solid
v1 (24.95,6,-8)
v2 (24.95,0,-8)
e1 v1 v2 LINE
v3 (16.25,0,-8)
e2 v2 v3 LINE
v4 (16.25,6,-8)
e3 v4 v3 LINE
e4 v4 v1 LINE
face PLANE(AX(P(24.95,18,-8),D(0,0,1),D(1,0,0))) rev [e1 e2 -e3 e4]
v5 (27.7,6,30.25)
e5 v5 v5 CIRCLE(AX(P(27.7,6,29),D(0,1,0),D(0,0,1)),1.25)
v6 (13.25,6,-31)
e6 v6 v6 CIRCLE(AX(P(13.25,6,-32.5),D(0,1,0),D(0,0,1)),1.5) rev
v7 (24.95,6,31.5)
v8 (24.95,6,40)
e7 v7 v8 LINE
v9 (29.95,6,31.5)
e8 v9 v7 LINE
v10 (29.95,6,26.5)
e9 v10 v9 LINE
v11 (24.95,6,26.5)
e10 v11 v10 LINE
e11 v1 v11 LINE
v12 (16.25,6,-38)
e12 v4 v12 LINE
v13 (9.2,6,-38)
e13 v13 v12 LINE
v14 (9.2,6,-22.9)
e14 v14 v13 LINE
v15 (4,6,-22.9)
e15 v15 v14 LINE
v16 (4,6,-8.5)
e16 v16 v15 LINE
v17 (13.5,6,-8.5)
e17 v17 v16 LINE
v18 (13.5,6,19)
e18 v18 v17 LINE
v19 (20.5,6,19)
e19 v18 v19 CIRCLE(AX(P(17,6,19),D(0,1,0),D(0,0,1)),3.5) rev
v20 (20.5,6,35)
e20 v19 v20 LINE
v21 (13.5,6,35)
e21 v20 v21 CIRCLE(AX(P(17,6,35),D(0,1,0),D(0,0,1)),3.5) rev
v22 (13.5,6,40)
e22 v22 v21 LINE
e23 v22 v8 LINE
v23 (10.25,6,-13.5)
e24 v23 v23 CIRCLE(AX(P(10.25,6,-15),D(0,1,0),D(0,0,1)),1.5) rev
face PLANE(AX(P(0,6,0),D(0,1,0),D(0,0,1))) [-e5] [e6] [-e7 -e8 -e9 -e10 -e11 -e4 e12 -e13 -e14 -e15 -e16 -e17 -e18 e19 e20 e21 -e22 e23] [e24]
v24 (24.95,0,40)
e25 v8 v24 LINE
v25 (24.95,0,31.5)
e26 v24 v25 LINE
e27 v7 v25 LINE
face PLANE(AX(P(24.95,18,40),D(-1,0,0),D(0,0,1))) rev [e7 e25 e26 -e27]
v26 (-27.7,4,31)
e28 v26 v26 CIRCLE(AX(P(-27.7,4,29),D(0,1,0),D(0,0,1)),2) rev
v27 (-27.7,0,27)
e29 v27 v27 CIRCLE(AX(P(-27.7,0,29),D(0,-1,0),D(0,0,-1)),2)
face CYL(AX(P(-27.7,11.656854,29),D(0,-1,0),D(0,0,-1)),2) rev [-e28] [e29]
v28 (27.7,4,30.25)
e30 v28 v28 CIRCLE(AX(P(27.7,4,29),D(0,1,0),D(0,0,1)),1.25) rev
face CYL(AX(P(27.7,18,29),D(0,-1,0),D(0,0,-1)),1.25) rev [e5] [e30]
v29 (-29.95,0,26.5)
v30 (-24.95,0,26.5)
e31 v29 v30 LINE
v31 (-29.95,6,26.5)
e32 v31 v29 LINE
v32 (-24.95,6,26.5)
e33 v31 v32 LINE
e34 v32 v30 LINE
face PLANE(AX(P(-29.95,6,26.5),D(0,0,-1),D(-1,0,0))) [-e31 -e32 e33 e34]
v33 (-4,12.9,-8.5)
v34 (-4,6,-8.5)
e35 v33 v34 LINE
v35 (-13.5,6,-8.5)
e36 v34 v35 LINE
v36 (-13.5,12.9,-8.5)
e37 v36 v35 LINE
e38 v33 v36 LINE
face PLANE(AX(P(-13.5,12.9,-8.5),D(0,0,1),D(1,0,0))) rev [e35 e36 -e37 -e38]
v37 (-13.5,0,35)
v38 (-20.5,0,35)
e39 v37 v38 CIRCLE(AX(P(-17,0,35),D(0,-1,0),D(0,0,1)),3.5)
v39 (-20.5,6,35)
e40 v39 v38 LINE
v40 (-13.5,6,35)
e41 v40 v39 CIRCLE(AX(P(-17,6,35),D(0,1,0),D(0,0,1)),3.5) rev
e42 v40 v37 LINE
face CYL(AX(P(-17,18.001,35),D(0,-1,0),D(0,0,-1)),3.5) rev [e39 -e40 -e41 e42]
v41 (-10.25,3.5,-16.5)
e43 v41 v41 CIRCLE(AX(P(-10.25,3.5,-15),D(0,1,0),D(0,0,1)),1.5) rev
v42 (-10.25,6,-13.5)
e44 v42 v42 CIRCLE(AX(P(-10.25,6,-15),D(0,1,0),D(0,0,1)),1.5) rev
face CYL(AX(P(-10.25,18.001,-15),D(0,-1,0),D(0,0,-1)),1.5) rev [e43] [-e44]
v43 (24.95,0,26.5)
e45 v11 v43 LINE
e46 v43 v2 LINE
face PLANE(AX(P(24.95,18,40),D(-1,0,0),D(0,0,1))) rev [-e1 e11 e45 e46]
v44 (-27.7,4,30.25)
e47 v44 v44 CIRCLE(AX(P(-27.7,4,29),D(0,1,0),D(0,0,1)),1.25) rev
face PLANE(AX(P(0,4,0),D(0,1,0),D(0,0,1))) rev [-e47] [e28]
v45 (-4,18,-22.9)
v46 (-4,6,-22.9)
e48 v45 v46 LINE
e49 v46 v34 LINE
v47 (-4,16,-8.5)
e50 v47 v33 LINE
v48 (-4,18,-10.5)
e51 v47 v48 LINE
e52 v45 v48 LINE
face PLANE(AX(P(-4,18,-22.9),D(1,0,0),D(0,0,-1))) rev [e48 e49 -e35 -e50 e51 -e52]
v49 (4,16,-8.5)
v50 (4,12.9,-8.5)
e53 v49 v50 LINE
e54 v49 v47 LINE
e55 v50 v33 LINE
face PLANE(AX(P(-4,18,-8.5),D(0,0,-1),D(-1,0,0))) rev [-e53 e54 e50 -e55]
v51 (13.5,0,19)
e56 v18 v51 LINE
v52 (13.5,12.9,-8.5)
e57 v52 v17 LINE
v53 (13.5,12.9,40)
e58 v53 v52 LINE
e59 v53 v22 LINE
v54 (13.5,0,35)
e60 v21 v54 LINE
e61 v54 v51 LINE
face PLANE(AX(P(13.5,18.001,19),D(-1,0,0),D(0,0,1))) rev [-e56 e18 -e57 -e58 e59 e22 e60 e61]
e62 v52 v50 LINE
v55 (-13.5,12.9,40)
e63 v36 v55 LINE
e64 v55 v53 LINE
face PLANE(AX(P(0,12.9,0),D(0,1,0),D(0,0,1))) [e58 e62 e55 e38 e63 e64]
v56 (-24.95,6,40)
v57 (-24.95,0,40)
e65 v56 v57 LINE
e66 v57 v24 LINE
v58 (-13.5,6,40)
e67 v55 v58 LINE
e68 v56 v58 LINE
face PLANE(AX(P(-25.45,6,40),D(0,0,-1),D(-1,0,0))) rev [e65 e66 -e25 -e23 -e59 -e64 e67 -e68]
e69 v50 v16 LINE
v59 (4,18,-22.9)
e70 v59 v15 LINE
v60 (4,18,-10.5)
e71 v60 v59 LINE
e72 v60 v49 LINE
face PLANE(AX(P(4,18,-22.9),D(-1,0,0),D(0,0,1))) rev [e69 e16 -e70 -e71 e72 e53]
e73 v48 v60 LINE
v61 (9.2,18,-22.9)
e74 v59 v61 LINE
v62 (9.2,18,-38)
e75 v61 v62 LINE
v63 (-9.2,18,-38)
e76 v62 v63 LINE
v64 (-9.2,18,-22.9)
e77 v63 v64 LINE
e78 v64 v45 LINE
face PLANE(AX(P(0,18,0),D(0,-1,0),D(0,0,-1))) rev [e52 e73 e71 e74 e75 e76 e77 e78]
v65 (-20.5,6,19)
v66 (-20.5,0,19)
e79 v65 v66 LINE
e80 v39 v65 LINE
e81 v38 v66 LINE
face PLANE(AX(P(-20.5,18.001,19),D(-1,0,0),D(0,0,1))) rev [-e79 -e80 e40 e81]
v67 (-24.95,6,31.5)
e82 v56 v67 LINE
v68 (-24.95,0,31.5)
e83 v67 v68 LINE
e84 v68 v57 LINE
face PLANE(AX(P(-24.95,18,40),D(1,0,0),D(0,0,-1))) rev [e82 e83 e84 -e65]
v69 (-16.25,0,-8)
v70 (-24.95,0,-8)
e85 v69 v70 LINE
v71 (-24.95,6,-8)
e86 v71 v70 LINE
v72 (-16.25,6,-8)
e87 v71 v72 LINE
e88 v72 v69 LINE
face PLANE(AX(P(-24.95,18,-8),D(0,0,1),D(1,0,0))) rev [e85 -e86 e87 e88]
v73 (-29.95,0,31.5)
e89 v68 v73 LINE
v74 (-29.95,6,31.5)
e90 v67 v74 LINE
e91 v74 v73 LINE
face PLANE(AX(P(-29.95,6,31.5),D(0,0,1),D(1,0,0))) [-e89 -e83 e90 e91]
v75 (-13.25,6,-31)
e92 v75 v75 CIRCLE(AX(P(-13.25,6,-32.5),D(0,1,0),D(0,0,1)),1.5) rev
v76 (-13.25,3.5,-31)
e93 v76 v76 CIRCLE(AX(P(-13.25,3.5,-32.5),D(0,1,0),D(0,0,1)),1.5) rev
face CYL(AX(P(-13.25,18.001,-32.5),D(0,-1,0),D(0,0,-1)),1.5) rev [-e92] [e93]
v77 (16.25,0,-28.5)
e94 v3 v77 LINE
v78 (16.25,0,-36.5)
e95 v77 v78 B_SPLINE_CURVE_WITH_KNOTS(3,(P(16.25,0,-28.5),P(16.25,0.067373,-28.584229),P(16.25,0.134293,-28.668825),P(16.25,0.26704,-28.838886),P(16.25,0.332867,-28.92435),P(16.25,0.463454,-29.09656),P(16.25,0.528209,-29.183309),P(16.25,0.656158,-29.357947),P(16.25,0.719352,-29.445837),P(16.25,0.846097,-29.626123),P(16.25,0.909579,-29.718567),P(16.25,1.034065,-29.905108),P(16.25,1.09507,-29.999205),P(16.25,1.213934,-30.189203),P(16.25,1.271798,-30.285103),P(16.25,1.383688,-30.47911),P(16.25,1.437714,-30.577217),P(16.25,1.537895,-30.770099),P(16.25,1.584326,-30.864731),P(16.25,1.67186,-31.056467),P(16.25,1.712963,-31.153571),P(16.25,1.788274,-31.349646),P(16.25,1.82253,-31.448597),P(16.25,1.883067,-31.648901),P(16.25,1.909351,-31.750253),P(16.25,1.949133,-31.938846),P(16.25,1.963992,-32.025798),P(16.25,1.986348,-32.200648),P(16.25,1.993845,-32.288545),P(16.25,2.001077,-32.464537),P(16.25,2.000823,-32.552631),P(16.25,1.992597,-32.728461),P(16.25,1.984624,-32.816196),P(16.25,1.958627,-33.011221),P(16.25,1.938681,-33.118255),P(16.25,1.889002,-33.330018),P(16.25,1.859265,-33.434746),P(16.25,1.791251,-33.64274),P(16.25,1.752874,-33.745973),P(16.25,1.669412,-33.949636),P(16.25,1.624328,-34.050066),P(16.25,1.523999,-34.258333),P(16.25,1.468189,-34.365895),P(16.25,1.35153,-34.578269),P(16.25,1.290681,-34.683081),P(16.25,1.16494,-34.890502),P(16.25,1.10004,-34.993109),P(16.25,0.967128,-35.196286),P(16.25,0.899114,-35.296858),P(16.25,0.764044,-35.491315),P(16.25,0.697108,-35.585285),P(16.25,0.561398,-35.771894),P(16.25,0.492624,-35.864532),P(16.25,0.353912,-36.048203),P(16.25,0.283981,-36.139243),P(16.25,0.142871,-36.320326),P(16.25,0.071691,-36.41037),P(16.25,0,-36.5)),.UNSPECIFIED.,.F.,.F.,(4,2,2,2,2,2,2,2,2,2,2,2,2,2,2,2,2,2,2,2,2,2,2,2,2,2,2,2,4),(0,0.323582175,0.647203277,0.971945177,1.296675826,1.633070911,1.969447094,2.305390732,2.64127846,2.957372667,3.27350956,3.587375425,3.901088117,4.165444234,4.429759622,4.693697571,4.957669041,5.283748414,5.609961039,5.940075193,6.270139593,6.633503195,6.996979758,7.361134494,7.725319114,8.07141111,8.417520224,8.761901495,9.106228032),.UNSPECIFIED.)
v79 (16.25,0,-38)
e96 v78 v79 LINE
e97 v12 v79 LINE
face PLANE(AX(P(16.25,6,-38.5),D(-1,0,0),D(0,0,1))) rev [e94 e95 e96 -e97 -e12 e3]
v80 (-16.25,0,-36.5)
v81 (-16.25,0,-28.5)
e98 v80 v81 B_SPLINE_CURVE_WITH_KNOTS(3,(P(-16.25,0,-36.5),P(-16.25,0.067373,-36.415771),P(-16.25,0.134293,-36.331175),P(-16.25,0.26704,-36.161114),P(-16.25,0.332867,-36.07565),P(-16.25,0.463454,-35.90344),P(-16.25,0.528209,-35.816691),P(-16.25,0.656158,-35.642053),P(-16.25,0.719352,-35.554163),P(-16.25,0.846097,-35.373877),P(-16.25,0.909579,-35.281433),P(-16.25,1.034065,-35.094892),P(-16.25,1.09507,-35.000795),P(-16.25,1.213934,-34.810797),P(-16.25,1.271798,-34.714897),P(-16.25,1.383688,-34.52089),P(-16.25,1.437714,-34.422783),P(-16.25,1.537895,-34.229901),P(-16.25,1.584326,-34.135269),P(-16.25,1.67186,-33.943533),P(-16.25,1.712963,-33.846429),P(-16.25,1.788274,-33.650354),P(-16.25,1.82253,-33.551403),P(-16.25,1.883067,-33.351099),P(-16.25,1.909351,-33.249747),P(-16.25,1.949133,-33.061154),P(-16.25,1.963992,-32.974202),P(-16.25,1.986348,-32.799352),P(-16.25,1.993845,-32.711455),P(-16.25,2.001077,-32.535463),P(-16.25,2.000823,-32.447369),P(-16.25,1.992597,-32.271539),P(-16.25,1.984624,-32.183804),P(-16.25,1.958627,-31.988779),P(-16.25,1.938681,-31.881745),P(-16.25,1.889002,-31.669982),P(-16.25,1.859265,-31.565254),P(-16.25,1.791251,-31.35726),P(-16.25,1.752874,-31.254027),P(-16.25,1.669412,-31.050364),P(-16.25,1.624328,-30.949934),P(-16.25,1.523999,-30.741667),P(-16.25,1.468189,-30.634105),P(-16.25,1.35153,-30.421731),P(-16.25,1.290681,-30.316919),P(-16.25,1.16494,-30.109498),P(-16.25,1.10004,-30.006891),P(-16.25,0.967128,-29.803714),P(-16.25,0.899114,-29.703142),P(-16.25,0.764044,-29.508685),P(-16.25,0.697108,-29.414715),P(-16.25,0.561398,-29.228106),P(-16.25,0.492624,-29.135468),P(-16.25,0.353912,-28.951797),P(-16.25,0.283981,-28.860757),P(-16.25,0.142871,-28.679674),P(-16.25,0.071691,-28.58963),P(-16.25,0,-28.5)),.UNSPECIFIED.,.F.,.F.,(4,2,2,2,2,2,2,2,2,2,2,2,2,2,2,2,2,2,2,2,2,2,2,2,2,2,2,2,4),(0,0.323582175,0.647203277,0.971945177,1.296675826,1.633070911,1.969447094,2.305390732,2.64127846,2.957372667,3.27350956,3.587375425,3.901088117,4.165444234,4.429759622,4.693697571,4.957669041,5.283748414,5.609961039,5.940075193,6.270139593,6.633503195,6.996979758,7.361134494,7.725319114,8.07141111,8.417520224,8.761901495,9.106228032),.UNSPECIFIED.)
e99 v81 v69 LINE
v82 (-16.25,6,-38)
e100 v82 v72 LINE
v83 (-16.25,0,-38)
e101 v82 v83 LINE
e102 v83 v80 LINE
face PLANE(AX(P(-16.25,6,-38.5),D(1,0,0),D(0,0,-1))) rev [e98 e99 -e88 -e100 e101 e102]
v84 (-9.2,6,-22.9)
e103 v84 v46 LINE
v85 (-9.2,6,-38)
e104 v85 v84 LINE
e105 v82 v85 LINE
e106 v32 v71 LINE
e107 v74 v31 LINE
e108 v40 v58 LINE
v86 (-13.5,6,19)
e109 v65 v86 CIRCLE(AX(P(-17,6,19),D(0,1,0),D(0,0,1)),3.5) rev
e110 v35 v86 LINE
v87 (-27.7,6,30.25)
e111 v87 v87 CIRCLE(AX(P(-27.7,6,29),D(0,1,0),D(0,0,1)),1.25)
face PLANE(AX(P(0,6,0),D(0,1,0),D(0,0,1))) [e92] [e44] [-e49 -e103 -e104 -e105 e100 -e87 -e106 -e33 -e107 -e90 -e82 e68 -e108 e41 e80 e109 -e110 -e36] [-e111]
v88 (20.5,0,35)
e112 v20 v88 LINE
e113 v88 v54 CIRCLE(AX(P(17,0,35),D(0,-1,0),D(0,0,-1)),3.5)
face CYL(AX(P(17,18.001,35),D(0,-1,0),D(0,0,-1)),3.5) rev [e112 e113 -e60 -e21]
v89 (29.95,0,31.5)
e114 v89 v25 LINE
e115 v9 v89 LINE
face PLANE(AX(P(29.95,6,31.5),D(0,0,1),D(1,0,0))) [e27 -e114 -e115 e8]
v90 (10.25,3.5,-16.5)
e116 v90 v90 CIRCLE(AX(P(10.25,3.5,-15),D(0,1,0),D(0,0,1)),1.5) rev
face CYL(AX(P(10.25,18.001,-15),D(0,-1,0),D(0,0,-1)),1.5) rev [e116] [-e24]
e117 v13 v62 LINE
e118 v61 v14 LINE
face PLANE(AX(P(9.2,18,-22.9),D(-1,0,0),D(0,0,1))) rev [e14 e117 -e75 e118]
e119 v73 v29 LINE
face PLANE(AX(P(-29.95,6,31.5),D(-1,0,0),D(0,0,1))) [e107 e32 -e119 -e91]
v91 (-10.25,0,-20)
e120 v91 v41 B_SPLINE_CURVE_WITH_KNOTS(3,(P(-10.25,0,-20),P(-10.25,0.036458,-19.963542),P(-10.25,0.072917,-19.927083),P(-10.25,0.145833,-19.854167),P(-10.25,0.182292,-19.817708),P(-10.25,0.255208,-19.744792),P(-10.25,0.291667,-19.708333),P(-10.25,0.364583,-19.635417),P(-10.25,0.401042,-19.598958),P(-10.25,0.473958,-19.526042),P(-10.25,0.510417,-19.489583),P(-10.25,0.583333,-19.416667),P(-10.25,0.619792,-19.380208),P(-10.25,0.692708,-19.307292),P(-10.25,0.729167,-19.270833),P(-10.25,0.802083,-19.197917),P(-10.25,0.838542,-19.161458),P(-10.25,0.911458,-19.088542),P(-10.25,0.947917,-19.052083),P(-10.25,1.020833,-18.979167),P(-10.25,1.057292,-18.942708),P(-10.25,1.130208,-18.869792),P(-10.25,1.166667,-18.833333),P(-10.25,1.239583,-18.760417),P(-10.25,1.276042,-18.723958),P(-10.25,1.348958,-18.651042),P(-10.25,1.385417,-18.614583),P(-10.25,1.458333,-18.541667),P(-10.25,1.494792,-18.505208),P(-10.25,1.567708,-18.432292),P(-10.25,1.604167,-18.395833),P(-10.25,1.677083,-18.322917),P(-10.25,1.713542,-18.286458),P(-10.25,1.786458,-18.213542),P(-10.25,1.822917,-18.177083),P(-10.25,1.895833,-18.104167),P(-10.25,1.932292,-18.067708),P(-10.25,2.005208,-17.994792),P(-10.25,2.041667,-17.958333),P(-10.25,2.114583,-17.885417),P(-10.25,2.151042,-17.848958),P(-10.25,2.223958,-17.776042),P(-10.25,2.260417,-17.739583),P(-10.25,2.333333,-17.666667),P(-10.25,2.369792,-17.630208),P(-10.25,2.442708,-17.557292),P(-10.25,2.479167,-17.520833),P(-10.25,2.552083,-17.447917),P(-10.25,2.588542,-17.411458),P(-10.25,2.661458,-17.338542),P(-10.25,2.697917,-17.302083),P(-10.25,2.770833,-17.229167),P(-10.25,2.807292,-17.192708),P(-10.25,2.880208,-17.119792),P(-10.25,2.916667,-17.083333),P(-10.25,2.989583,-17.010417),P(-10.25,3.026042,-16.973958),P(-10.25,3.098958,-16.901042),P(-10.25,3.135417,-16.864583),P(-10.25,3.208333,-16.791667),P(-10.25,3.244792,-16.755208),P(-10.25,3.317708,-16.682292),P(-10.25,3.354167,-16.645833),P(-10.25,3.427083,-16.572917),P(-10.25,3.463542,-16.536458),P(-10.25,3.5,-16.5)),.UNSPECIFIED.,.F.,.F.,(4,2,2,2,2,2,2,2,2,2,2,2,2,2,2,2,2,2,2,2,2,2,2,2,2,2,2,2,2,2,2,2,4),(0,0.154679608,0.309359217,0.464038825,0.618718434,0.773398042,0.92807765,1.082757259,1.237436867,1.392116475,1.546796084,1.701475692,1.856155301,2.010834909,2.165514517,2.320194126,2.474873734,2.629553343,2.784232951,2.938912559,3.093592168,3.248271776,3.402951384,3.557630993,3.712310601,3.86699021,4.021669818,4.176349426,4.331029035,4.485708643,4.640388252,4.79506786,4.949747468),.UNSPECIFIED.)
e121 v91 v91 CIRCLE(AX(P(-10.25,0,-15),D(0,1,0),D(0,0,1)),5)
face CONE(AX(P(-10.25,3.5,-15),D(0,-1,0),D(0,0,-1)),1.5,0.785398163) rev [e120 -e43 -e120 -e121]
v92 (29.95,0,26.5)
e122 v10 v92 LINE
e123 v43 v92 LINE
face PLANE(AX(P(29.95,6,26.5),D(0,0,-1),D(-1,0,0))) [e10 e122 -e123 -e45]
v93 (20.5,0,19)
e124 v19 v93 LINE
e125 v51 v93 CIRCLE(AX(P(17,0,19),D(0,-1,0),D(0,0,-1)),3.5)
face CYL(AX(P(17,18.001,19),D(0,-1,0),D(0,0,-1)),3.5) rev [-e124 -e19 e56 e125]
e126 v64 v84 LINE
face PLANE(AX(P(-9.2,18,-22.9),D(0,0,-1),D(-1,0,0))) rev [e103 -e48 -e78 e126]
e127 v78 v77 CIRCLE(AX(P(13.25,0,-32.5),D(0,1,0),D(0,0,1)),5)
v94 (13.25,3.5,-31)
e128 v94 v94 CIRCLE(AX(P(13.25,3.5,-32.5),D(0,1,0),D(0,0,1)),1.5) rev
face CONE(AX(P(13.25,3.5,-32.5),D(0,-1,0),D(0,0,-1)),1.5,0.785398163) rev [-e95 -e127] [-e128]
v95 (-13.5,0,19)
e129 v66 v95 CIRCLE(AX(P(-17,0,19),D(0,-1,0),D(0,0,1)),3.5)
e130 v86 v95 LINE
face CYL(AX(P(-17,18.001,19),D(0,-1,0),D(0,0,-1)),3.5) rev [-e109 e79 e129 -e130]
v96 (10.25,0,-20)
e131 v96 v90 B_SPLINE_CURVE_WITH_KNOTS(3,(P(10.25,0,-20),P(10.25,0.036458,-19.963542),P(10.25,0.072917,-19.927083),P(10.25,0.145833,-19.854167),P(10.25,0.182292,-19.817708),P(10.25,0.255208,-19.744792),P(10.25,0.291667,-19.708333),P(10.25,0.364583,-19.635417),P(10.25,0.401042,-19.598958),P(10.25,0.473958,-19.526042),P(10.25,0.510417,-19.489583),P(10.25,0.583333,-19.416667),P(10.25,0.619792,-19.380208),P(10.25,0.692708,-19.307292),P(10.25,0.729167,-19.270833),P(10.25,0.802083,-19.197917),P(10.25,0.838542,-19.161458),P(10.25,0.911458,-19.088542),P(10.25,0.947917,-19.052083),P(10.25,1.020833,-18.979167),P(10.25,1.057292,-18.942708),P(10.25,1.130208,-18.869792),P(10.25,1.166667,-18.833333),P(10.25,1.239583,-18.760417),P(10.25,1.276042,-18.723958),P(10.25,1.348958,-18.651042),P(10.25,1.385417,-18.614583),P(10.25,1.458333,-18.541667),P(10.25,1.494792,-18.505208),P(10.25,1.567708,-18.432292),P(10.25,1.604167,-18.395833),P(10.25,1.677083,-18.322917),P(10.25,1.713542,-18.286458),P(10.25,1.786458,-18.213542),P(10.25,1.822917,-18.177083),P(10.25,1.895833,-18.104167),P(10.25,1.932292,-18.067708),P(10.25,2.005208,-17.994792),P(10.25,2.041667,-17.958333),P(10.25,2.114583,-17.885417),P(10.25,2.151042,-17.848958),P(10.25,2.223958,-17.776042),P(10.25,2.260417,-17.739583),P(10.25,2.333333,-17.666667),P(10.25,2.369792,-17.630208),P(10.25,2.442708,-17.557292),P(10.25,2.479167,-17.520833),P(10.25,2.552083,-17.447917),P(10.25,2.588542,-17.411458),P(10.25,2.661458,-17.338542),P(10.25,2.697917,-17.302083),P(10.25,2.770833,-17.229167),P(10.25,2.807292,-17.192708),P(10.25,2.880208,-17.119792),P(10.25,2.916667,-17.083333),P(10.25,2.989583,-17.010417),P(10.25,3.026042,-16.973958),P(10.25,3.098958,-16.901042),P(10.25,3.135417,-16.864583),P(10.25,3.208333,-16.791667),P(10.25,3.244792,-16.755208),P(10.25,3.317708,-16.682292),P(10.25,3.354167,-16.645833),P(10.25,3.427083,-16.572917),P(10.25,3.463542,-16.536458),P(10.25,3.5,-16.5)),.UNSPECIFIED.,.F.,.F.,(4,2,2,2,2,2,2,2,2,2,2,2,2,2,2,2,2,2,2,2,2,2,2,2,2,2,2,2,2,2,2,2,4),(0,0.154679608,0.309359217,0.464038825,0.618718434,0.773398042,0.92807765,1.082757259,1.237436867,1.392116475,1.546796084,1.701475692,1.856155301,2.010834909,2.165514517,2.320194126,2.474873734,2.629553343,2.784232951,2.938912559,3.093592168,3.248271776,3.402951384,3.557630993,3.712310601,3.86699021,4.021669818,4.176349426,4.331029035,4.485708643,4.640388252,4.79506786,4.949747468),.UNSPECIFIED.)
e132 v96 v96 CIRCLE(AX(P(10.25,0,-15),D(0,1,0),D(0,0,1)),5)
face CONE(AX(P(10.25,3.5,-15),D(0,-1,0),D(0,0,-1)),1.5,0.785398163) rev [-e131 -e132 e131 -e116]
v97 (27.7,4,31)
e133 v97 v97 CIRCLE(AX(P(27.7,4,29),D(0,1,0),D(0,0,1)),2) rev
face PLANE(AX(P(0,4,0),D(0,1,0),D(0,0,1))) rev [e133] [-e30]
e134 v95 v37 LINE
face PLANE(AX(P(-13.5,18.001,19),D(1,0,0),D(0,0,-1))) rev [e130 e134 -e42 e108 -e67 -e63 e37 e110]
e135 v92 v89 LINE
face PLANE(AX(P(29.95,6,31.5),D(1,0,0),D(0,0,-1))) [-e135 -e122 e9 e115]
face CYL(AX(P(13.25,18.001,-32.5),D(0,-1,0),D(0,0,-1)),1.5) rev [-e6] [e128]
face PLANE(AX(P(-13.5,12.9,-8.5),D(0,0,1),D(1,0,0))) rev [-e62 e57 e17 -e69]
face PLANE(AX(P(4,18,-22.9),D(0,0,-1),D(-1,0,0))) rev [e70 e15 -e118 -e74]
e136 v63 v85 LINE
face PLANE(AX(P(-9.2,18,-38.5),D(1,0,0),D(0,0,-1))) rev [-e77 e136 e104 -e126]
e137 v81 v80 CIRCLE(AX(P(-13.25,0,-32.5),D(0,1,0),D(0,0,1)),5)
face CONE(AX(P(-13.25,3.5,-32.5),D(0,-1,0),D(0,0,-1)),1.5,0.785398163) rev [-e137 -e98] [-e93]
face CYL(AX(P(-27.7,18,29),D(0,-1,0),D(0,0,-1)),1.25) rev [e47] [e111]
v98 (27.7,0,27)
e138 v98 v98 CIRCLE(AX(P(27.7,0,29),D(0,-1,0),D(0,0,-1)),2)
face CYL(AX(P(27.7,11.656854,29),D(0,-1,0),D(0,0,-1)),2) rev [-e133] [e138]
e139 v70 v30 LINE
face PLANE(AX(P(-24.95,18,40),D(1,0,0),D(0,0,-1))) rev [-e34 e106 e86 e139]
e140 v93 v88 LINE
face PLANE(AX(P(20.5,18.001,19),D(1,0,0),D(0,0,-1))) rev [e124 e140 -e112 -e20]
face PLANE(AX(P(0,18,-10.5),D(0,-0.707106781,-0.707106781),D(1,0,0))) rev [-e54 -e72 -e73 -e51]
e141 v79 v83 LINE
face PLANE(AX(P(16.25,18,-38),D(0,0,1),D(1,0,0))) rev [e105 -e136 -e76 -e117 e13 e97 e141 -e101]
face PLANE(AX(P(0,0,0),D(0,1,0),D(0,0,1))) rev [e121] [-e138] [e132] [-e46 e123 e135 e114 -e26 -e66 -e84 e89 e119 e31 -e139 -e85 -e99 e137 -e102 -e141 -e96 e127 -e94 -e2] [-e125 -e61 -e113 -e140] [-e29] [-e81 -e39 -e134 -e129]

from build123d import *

# Parameters (mm, degrees)
EXTRUDE_1_DEPTH     = 6
EXTRUDE_2_DEPTH     = 12
CUT_EXTRUDE_1_REACH = 52.712
SKETCH_3_R          = 1.5
CHAMFER_1_SIZE      = 2
SKETCH_4_W          = 27
SKETCH_4_H          = 48.5
EXTRUDE_3_DEPTH     = 6.9
SKETCH_5_W          = 32.5
SKETCH_5_H          = 0.5
CUT_EXTRUDE_2_DEPTH = 51.711956184
SKETCH_6_W          = 5
SKETCH_6_H          = 5
EXTRUDE_4_DEPTH     = 6
SKETCH_9_R          = 1.25
CUT_EXTRUDE_5_DEPTH = 54.113110434
SKETCH_10_R         = 2
CUT_EXTRUDE_6_DEPTH = 4
CHAMFER_3_SIZE      = 3.5


with BuildPart() as part:
    # 草图1 → 凸台-拉伸1 (new body)
    with BuildSketch(Plane(origin=(0, 0, 0), x_dir=(1, 0, 0), z_dir=(0, 1, 0))):
        Polygon((-25.45, -32), (-25.45, -28), (-25.45, -3.5), (-25.45, 0.5), (-25.45, 8.5), (-16.25, 8.5), (-16.25, 38.5), (16.25, 38.5), (16.25, 8.5), (25.45, 8.5), (25.45, 0.5), (25.45, -3.5), (25.45, -28), (25.45, -32), (25.45, -40), (-25.45, -40), align=None)
    extrude(amount=EXTRUDE_1_DEPTH)

    # 草图2 → 凸台-拉伸2 (add)
    with BuildSketch(Plane(origin=(0, 6, 0), x_dir=(1, 0, 0), z_dir=(0, 1, 0))):
        Polygon((-4, 22.9), (-4, 8.5), (4, 8.5), (4, 22.9), (9.2, 22.9), (9.2, 38.5), (-9.2, 38.5), (-9.2, 22.9), align=None)
    extrude(amount=EXTRUDE_2_DEPTH)

    # 草图3 → 切除-拉伸1 (cut, up to next)
    with BuildSketch(Plane.XZ, mode=Mode.PRIVATE) as cut_extrude_1_sk1:
        with Locations(Location((13.25, -32.5, 0), (0, 0, 270))):
            Circle(SKETCH_3_R)
    cut_extrude_1_tool1 = extrude(cut_extrude_1_sk1.sketch, amount=-CUT_EXTRUDE_1_REACH, mode=Mode.PRIVATE) & part.part
    # 草图3 → 切除-拉伸1 (cut, up to next)
    with BuildSketch(Plane.XZ, mode=Mode.PRIVATE) as cut_extrude_1_sk2:
        with Locations(Location((10.25, -15, 0), (0, 0, 270))):
            Circle(SKETCH_3_R)
    cut_extrude_1_tool2 = extrude(cut_extrude_1_sk2.sketch, amount=-CUT_EXTRUDE_1_REACH, mode=Mode.PRIVATE) & part.part
    # 草图3 → 切除-拉伸1 (cut, up to next)
    with BuildSketch(Plane.XZ, mode=Mode.PRIVATE) as cut_extrude_1_sk3:
        with Locations(Location((-13.25, -32.5, 0), (0, 0, 90))):
            Circle(SKETCH_3_R)
    cut_extrude_1_tool3 = extrude(cut_extrude_1_sk3.sketch, amount=-CUT_EXTRUDE_1_REACH, mode=Mode.PRIVATE) & part.part
    # 草图3 → 切除-拉伸1 (cut, up to next)
    with BuildSketch(Plane.XZ, mode=Mode.PRIVATE) as cut_extrude_1_sk4:
        with Locations(Location((-10.25, -15, 0), (0, 0, 90))):
            Circle(SKETCH_3_R)
    cut_extrude_1_tool4 = extrude(cut_extrude_1_sk4.sketch, amount=-CUT_EXTRUDE_1_REACH, mode=Mode.PRIVATE) & part.part
    # 草图3 → 切除-拉伸1 (cut, up to next)
    with BuildSketch(Plane.XZ, mode=Mode.PRIVATE) as cut_extrude_1_sk5:
        with BuildLine():
            Line((13.5, 19), (13.5, 35))
            ThreePointArc((13.5, 35), (17, 38.5), (20.5, 35))
            Line((20.5, 35), (20.5, 19))
            ThreePointArc((20.5, 19), (17, 15.5), (13.5, 19))
        make_face()
    cut_extrude_1_tool5 = extrude(cut_extrude_1_sk5.sketch, amount=-CUT_EXTRUDE_1_REACH, mode=Mode.PRIVATE) & part.part
    # 草图3 → 切除-拉伸1 (cut, up to next)
    with BuildSketch(Plane.XZ, mode=Mode.PRIVATE) as cut_extrude_1_sk6:
        with BuildLine():
            Line((-13.5, 19), (-13.5, 35))
            ThreePointArc((-13.5, 35), (-17, 38.5), (-20.5, 35))
            Line((-20.5, 35), (-20.5, 19))
            ThreePointArc((-20.5, 19), (-17, 15.5), (-13.5, 19))
        make_face()
    cut_extrude_1_tool6 = extrude(cut_extrude_1_sk6.sketch, amount=-CUT_EXTRUDE_1_REACH, mode=Mode.PRIVATE) & part.part
    add(cut_extrude_1_tool1.solids().sort_by_distance((13.25, 0, -32.5))[0], mode=Mode.SUBTRACT)
    add(cut_extrude_1_tool2.solids().sort_by_distance((10.25, 0, -15))[0], mode=Mode.SUBTRACT)
    add(cut_extrude_1_tool3.solids().sort_by_distance((-13.25, 0, -32.5))[0], mode=Mode.SUBTRACT)
    add(cut_extrude_1_tool4.solids().sort_by_distance((-10.25, 0, -15))[0], mode=Mode.SUBTRACT)
    add(cut_extrude_1_tool5.solids().sort_by_distance((17, 0, 27))[0], mode=Mode.SUBTRACT)
    add(cut_extrude_1_tool6.solids().sort_by_distance((-17, 0, 27))[0], mode=Mode.SUBTRACT)

    # 倒角1
    chamfer_1_edges = [part.edges().sort_by_distance(p)[0] for p in [
        (0, 18, -8.5),
    ]]
    chamfer(chamfer_1_edges, length=CHAMFER_1_SIZE)

    # 草图4 → 凸台-拉伸3 (add)
    with BuildSketch(Plane(origin=(0, 6, 0), x_dir=(1, 0, 0), z_dir=(0, 1, 0))):
        with Locations((0, -15.75)):
            Rectangle(SKETCH_4_W, SKETCH_4_H)
    extrude(amount=EXTRUDE_3_DEPTH)

    # 草图5 → 切除-拉伸2 (cut, through all)
    with BuildSketch(Plane.XZ):
        Polygon((24.95, 40), (24.95, -8), (16.25, -8), (16.25, -8.5), (25.45, -8.5), (25.45, 40), align=None)
        Polygon((-16.25, -8.5), (-25.45, -8.5), (-25.45, 40), (-24.95, 40), (-24.95, -8), (-16.25, -8), align=None)
        with Locations((0, -38.25)):
            Rectangle(SKETCH_5_W, SKETCH_5_H)
    extrude(amount=-CUT_EXTRUDE_2_DEPTH, mode=Mode.SUBTRACT)

    # 草图6 → 凸台-拉伸4 (add)
    with BuildSketch(Plane.XZ):
        with Locations((-27.45, 29)):
            Rectangle(SKETCH_6_W, SKETCH_6_H)
        with Locations((27.45, 29)):
            Rectangle(SKETCH_6_W, SKETCH_6_H)
    extrude(amount=-EXTRUDE_4_DEPTH)

    # 草图9 → 切除-拉伸5 (cut, through all)
    with BuildSketch(Plane.XZ):
        with Locations(Location((-27.7, 29, 0), (0, 0, 270))):
            Circle(SKETCH_9_R)
        with Locations(Location((27.7, 29, 0), (0, 0, 270))):
            Circle(SKETCH_9_R)
    extrude(amount=-CUT_EXTRUDE_5_DEPTH, mode=Mode.SUBTRACT)

    # 草图10 → 切除-拉伸6 (cut)
    with BuildSketch(Plane.XZ):
        with Locations(Location((27.7, 29, 0), (0, 0, 270))):
            Circle(SKETCH_10_R)
        with Locations(Location((-27.7, 29, 0), (0, 0, 270))):
            Circle(SKETCH_10_R)
    extrude(amount=-CUT_EXTRUDE_6_DEPTH, mode=Mode.SUBTRACT)

    # 倒角3
    # the kernel refuses this chamfer: 3.5 mm, written as the material it takes off along each edge
    with BuildSketch(Plane(origin=(10.25, 0, -15), x_dir=(0, 0, -1), z_dir=(-1, 0, 0))) as chamfer_3_piece_1:
        Polygon((1.5 + CHAMFER_3_SIZE, 0), (1.5, -CHAMFER_3_SIZE), (1.5, 0), align=None)
    revolve(axis=Axis((10.25, 0, -15), (0, -1, 0)), mode=Mode.SUBTRACT)
    with BuildSketch(Plane(origin=(-13.25, 0, -32.5), x_dir=(0, 0, 1), z_dir=(1, 0, 0))) as chamfer_3_piece_2:
        Polygon((1.5, -CHAMFER_3_SIZE), (1.5 + CHAMFER_3_SIZE, 0), (1.5, 0), align=None)
    revolve(axis=Axis((-13.25, 0, -32.5), (0, -1, 0)), mode=Mode.SUBTRACT)
    with BuildSketch(Plane(origin=(13.25, 0, -32.5), x_dir=(0, 0, -1), z_dir=(-1, 0, 0))) as chamfer_3_piece_3:
        Polygon((1.5 + CHAMFER_3_SIZE, 0), (1.5, -CHAMFER_3_SIZE), (1.5, 0), align=None)
    revolve(axis=Axis((13.25, 0, -32.5), (0, -1, 0)), mode=Mode.SUBTRACT)
    with BuildSketch(Plane(origin=(-10.25, 0, -15), x_dir=(0, 0, 1), z_dir=(1, 0, 0))) as chamfer_3_piece_4:
        Polygon((1.5, -CHAMFER_3_SIZE), (1.5 + CHAMFER_3_SIZE, 0), (1.5, 0), align=None)
    revolve(axis=Axis((-10.25, 0, -15), (0, -1, 0)), mode=Mode.SUBTRACT)


solid = part.part
